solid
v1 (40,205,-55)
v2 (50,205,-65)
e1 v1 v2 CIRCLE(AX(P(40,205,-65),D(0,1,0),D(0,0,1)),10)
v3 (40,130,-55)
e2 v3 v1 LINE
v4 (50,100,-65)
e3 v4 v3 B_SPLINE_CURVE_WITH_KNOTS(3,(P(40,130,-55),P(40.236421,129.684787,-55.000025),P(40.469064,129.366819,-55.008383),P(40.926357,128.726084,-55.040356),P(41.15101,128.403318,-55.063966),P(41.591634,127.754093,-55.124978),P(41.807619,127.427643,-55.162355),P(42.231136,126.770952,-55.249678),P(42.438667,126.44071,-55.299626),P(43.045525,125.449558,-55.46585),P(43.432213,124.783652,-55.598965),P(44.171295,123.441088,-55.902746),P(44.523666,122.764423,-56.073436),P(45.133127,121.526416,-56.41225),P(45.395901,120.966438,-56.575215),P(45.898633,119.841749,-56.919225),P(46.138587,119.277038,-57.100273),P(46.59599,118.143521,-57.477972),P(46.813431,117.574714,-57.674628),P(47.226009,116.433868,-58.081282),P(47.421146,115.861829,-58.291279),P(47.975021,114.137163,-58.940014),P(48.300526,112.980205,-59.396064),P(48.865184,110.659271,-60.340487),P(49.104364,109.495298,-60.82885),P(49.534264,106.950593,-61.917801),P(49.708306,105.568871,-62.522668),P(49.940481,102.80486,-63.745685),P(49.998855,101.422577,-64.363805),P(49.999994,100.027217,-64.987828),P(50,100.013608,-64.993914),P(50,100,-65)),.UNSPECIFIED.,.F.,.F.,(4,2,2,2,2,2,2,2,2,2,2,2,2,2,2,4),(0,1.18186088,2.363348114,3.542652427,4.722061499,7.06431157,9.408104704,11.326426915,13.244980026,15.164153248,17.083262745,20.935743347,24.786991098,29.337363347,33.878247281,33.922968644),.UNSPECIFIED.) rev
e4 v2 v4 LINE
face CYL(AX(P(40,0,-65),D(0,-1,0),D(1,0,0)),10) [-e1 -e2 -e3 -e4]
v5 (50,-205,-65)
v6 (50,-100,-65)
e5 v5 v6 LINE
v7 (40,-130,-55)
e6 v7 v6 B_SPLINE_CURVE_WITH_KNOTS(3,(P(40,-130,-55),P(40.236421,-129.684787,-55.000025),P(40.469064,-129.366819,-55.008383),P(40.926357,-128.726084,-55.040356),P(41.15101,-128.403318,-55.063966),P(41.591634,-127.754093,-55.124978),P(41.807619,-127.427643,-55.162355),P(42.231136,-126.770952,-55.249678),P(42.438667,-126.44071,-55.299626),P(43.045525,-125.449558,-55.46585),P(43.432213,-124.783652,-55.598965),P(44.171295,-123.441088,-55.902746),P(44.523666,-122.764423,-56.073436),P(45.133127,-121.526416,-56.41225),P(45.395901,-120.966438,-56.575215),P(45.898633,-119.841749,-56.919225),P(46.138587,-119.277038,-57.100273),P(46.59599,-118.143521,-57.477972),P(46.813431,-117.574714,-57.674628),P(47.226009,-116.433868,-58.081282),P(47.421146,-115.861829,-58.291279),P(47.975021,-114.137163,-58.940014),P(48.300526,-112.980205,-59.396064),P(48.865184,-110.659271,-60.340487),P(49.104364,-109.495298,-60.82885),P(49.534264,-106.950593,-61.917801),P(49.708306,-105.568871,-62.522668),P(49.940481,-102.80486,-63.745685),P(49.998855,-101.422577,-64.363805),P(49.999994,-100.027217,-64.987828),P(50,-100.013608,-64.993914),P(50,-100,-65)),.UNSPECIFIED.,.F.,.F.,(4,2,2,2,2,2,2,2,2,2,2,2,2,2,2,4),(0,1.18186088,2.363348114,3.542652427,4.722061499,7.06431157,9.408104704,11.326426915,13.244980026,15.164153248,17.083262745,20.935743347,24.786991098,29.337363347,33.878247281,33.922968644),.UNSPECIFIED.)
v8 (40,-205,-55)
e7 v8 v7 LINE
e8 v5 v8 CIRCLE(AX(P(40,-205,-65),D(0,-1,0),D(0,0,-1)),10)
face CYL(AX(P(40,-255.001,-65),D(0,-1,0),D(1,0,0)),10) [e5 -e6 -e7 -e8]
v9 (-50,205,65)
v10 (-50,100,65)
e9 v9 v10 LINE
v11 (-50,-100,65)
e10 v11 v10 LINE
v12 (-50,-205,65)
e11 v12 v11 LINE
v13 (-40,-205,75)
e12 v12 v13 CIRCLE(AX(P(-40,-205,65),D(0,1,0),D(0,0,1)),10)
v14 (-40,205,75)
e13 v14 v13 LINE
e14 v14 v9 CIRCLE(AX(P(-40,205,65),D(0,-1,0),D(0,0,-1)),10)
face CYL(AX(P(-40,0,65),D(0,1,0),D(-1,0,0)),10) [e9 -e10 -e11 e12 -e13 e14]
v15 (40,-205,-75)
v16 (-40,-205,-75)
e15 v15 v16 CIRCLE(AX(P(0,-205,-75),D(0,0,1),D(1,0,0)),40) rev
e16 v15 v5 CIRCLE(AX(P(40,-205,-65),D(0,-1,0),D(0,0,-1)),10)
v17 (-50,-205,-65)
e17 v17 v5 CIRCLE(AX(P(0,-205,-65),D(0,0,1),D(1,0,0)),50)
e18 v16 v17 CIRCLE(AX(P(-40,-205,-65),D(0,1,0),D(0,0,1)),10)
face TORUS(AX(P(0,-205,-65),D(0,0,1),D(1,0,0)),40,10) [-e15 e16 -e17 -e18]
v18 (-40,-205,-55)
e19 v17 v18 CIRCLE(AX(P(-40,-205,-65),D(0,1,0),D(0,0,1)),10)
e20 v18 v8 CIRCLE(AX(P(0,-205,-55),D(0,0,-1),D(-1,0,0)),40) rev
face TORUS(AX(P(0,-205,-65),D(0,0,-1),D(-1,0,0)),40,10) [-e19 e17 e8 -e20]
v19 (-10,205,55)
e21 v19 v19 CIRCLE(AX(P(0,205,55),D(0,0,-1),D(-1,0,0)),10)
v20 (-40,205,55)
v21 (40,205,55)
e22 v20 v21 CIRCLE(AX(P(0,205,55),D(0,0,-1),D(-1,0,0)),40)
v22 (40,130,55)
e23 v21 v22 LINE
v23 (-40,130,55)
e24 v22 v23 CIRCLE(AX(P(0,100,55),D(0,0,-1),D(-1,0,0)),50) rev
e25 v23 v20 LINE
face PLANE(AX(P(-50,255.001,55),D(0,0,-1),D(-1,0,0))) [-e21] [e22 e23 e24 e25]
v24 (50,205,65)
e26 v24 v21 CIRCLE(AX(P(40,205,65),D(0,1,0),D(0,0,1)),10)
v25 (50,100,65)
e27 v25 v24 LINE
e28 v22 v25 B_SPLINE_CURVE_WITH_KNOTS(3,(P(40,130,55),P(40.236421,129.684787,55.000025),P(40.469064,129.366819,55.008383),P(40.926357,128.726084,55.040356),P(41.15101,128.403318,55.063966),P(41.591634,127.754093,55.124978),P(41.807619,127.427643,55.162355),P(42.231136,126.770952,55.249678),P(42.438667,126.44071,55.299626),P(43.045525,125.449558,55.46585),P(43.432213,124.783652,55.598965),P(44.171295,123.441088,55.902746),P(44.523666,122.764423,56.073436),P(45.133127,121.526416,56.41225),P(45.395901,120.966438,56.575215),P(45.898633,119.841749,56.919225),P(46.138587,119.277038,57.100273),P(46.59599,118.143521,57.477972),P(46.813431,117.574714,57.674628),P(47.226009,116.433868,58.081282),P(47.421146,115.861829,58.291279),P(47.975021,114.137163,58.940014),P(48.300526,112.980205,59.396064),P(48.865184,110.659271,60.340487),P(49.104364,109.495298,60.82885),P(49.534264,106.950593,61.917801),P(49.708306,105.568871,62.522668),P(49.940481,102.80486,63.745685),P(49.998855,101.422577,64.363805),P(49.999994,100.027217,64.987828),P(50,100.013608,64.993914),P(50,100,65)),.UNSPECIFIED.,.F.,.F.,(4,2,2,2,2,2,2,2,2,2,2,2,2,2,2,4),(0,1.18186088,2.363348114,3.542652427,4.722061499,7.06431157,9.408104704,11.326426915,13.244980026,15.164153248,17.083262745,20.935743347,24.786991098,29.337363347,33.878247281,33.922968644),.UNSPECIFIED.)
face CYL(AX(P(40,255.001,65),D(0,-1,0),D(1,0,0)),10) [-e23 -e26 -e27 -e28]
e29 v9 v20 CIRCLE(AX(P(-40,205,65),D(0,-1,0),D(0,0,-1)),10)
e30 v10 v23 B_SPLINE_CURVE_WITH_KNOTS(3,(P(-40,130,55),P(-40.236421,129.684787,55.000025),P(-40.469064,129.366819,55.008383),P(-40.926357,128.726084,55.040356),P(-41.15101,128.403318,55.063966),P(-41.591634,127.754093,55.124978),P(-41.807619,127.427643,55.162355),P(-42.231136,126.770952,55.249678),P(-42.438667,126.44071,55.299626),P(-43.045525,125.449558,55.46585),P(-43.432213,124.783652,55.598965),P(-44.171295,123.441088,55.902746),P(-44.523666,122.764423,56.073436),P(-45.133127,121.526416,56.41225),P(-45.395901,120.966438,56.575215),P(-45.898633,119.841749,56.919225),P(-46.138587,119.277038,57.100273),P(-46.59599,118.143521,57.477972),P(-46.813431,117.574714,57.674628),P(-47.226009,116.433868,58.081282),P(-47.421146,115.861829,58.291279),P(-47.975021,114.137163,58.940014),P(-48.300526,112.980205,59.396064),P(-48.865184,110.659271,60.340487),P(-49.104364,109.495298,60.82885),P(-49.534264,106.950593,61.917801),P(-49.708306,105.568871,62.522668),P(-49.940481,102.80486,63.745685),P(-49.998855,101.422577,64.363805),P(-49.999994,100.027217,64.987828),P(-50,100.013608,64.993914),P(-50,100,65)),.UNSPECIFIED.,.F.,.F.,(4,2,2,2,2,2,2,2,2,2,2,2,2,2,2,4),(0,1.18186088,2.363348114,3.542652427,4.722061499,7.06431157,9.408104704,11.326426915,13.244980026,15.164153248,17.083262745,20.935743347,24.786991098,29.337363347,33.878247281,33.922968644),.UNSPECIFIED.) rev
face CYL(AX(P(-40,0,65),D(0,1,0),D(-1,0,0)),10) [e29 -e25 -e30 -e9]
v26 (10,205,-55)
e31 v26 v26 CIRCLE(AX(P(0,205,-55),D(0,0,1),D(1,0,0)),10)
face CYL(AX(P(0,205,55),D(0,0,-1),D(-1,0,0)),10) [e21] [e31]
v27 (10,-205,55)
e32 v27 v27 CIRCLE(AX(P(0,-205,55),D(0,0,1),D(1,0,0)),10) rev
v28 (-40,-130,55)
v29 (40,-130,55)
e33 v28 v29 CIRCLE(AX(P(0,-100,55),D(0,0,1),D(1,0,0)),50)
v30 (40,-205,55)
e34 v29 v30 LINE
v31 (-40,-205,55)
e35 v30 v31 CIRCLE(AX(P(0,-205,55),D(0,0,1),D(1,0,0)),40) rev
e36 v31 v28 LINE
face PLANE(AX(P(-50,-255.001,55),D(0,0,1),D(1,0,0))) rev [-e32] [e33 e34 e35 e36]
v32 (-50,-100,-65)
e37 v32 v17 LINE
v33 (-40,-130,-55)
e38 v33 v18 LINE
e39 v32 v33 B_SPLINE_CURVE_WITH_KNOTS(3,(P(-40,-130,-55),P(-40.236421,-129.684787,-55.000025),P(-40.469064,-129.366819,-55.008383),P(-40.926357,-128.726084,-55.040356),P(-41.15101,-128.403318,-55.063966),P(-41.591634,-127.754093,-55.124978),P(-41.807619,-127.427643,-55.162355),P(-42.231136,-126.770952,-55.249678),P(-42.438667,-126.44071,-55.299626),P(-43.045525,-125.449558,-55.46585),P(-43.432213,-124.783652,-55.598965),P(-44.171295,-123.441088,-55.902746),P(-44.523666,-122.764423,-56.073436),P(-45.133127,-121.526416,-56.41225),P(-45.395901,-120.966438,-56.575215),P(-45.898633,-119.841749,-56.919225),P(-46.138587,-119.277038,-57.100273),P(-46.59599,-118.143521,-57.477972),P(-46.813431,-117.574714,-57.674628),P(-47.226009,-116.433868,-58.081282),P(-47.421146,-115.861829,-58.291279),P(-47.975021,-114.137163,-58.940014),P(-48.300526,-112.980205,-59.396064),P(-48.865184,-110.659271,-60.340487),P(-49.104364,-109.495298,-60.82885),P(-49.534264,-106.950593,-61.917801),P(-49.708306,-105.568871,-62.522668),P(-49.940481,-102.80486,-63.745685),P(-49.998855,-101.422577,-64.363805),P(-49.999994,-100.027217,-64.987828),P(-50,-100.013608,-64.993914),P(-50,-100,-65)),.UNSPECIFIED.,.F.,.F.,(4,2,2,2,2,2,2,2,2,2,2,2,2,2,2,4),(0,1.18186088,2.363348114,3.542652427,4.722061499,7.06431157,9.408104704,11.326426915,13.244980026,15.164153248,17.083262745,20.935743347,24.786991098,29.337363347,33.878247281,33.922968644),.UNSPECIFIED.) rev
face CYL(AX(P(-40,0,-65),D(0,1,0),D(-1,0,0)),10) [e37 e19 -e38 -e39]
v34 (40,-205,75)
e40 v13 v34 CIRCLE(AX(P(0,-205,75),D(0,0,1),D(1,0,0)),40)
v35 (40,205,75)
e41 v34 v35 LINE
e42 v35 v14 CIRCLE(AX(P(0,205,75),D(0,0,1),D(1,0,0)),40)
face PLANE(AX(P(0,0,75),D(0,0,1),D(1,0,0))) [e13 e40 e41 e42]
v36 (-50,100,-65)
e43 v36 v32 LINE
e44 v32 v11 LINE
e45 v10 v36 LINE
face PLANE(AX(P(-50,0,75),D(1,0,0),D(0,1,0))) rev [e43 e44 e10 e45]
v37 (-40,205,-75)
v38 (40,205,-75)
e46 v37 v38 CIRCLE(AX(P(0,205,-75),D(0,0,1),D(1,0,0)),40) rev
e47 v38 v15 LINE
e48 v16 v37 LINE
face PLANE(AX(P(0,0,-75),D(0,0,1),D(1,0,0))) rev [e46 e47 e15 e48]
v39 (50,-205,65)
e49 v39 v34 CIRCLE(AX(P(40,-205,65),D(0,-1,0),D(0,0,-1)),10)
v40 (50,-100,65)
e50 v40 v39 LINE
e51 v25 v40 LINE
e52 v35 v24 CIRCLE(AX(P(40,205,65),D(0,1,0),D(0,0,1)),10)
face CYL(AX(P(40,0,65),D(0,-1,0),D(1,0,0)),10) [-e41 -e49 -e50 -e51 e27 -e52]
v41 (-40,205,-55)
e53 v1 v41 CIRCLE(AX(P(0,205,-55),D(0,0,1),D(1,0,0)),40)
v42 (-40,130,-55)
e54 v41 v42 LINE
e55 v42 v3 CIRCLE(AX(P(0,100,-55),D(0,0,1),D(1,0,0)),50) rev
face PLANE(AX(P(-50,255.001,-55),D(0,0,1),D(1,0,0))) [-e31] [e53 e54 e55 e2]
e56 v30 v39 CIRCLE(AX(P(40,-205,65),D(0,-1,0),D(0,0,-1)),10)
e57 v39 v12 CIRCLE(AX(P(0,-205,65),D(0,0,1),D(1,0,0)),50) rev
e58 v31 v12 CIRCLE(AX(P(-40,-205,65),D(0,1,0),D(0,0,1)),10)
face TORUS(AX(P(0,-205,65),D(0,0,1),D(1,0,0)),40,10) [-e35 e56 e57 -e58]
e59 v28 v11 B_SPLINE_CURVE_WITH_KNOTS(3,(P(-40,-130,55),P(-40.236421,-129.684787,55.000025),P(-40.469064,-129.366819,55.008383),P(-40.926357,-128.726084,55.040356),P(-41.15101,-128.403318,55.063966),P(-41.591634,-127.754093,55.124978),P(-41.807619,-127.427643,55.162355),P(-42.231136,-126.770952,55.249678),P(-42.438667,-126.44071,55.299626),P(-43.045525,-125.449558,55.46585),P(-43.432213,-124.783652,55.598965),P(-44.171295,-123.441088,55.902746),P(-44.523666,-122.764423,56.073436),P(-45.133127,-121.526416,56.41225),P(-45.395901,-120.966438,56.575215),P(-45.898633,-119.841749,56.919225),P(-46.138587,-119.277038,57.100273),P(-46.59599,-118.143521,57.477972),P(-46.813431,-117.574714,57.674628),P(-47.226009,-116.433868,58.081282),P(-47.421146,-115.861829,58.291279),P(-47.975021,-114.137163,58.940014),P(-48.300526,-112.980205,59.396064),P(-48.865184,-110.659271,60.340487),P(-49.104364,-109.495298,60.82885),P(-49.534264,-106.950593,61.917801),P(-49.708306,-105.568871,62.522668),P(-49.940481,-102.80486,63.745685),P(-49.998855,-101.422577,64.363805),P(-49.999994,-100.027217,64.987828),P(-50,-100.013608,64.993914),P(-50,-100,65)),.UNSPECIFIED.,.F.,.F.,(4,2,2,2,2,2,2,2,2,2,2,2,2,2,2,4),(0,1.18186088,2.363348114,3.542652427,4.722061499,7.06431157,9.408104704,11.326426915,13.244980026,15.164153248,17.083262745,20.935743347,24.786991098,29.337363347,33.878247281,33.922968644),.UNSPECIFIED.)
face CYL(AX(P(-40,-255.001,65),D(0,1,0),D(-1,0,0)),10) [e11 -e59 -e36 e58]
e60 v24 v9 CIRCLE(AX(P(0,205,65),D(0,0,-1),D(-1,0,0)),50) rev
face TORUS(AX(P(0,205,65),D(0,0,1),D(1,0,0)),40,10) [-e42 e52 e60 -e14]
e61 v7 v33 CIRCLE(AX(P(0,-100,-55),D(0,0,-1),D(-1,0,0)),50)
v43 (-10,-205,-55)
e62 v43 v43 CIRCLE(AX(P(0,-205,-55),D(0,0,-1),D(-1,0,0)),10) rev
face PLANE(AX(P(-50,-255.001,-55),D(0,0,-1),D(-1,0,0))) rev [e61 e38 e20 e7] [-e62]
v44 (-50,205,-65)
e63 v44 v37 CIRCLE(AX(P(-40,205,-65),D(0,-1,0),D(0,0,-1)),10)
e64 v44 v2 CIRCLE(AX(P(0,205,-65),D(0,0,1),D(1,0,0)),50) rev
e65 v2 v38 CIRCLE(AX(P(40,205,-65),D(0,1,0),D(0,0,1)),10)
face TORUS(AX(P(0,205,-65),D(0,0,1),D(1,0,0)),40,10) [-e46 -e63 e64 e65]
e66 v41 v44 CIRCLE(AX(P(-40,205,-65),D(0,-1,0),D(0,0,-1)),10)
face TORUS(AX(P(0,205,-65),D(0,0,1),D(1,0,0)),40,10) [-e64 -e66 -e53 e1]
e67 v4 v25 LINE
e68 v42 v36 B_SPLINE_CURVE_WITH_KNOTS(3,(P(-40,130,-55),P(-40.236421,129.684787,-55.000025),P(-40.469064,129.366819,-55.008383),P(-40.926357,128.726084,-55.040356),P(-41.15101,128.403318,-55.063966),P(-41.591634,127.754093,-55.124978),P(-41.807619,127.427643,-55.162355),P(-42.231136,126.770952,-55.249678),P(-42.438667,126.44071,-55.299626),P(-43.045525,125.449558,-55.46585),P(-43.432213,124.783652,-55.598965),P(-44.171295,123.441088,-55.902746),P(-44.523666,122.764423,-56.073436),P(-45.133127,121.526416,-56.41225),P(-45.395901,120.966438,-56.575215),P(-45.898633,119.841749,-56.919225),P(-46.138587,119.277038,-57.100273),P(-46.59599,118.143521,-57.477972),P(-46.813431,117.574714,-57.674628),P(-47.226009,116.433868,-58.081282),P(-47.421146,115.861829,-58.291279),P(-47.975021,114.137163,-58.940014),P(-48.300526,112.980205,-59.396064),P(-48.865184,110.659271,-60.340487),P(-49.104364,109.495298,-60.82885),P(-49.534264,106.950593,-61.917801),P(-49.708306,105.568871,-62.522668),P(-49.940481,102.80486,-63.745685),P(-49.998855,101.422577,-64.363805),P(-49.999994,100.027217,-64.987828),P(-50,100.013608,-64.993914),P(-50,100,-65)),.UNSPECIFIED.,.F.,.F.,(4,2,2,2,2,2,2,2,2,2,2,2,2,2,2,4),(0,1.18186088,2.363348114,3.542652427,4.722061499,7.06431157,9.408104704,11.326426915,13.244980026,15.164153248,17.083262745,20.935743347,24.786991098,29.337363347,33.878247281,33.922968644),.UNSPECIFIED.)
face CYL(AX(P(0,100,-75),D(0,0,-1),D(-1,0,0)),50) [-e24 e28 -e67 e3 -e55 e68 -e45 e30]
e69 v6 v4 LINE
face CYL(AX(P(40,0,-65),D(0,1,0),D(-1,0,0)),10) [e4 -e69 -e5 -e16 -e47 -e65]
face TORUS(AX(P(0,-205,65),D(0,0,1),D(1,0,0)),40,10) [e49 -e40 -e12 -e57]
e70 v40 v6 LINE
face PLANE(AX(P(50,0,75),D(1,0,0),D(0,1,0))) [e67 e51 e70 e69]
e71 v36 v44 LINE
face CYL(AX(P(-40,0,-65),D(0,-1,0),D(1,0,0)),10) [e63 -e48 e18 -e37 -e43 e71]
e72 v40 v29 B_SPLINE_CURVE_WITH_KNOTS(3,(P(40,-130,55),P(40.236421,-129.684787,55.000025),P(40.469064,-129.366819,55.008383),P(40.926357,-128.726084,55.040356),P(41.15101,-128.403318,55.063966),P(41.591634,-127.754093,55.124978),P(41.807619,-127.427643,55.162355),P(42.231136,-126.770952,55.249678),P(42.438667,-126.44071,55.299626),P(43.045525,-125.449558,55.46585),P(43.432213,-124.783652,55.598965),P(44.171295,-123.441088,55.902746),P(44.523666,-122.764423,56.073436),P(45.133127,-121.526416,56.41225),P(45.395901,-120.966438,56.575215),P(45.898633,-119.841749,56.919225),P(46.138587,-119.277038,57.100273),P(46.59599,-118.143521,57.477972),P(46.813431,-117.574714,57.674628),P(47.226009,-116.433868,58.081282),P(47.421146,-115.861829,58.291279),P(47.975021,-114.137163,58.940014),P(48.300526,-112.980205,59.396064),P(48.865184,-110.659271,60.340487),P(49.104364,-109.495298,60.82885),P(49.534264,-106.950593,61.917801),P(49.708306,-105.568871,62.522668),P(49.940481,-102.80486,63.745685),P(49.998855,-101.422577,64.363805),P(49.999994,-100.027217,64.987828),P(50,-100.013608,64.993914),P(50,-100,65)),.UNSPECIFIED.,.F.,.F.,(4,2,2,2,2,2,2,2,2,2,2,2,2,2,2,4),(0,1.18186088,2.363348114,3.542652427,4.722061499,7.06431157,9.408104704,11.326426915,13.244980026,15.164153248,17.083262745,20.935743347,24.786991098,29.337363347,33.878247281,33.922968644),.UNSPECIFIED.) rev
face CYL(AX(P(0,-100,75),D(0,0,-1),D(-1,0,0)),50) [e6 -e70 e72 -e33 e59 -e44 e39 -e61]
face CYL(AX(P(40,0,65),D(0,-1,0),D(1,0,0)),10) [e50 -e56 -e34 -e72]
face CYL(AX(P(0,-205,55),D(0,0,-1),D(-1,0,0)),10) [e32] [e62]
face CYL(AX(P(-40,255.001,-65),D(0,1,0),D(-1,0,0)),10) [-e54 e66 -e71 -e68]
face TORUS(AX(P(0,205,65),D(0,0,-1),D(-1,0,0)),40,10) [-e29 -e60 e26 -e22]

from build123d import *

# Parameters (mm, degrees)
SKETCH3_W           = 100
SKETCH3_H           = 300
BOSS_EXTRUDE1_DEPTH = 75
CUT_EXTRUDE1_REACH  = 422.463
CUT_EXTRUDE1_START  = -150
SKETCH4_W           = 100
SKETCH4_H           = 110
SKETCH6_R           = 10
BOSS_EXTRUDE2_DEPTH = 55
CUT_EXTRUDE2_REACH  = 422.463
CUT_EXTRUDE2_START  = 150
SKETCH4_2_W         = 100
SKETCH4_2_H         = 110
FILLET1_RADIUS      = 50
FILLET1_LENGTH      = 110
FILLET2_RADIUS      = 50
FILLET2_LENGTH      = 110
FILLET3_R           = 10


with BuildPart() as part:
    # Sketch3 → Boss-Extrude1 (new, symmetric)
    with BuildSketch(Plane.XY):
        Rectangle(SKETCH3_W, SKETCH3_H)
        with BuildLine():
            Line((-50, -150), (-50, -205))
            ThreePointArc((-50, -205), (0, -255), (50, -205))
            Line((50, -205), (50, -150))
            Line((50, -150), (-50, -150))
        make_face()
        with BuildLine():
            ThreePointArc((-50, 205), (0, 255), (50, 205))
            Line((50, 205), (50, 150))
            Line((50, 150), (-50, 150))
            Line((-50, 150), (-50, 205))
        make_face()
    extrude(amount=BOSS_EXTRUDE1_DEPTH, both=True)

    # Sketch4 → Cut-Extrude1 (cut, up to next)
    with BuildSketch(Plane(origin=(0, 0, 0), x_dir=(1, 0, 0), z_dir=(0, 1, 0)).offset(CUT_EXTRUDE1_START), mode=Mode.PRIVATE) as cut_extrude1_sk1:
        Rectangle(SKETCH4_W, SKETCH4_H)
    cut_extrude1_tool1 = extrude(cut_extrude1_sk1.sketch, amount=-CUT_EXTRUDE1_REACH, mode=Mode.PRIVATE) & part.part
    add(cut_extrude1_tool1.solids().sort_by_distance((0, -150, 0))[0], mode=Mode.SUBTRACT)

    # Sketch6 → Boss-Extrude2 (add, symmetric)
    with BuildSketch(Plane.XY):
        with Locations(Location((0, -205, 0), (0, 0, 180))):
            Circle(SKETCH6_R)
    boss_extrude2 = extrude(amount=BOSS_EXTRUDE2_DEPTH, both=True)

    # Sketch4<2> → Cut-Extrude2 (cut, up to next)
    with BuildSketch(Plane(origin=(0, 0, 0), x_dir=(1, 0, 0), z_dir=(0, 1, 0)).offset(CUT_EXTRUDE2_START), mode=Mode.PRIVATE) as cut_extrude2_sk1:
        Rectangle(SKETCH4_2_W, SKETCH4_2_H)
    cut_extrude2_tool1 = extrude(cut_extrude2_sk1.sketch, amount=CUT_EXTRUDE2_REACH, mode=Mode.PRIVATE) & part.part
    add(cut_extrude2_tool1.solids().sort_by_distance((0, 150, 0))[0], mode=Mode.SUBTRACT)

    # Mirror2: Boss-Extrude2 across plane
    add(boss_extrude2.mirror(Plane.ZX))

    # Fillet1: full round fillet: the end face becomes a half cylinder, R = half its width
    fillet1_face = Plane((0, 150, 0), x_dir=(0, 0, -1), z_dir=(0, 1, 0))  # on the end face: x along it, z out of the body
    fillet1_slab = fillet1_face.offset(-FILLET1_RADIUS / 2) * Box(FILLET1_LENGTH, 2 * FILLET1_RADIUS, FILLET1_RADIUS, mode=Mode.PRIVATE)  # the body's end, R deep
    fillet1_round = Plane((0, 100, 0), x_dir=(0, 1, 0), z_dir=(0, 0, -1)) * Cylinder(FILLET1_RADIUS, FILLET1_LENGTH, mode=Mode.PRIVATE)  # its axis R under the face
    add(fillet1_slab - fillet1_round, mode=Mode.SUBTRACT)

    # Fillet2: full round fillet: the end face becomes a half cylinder, R = half its width
    fillet2_face = Plane((0, -150, 0), x_dir=(0, 0, 1), z_dir=(0, -1, 0))  # on the end face: x along it, z out of the body
    fillet2_slab = fillet2_face.offset(-FILLET2_RADIUS / 2) * Box(FILLET2_LENGTH, 2 * FILLET2_RADIUS, FILLET2_RADIUS, mode=Mode.PRIVATE)  # the body's end, R deep
    fillet2_round = Plane((0, -100, 0), x_dir=(0, -1, 0), z_dir=(0, 0, 1)) * Cylinder(FILLET2_RADIUS, FILLET2_LENGTH, mode=Mode.PRIVATE)  # its axis R under the face
    add(fillet2_slab - fillet2_round, mode=Mode.SUBTRACT)

    # Fillet3
    fillet3_edges = [part.edges().sort_by_distance(p)[0] for p in [
        (-50, -152.5, 55),
        (0, -255, 55),
        (-50, -152.5, -55),
        (0, -255, -55),
        (-50, 152.5, 55),
        (0, 255, 55),
        (-50, 152.5, -55),
        (0, 255, -55),
        (0, 255, -75),
        (-50, 0, -75),
        (0, -255, -75),
        (50, 0, -75),
        (0, 255, 75),
        (50, 0, 75),
        (0, -255, 75),
        (-50, 0, 75),
        (50, -152.5, 55),
        (50, -152.5, -55),
        (50, 152.5, 55),
        (50, 152.5, -55),
    ]]
    fillet(fillet3_edges, radius=FILLET3_R - 0.0001)  # a hair under: the kernel refuses the full size


solid = part.part
